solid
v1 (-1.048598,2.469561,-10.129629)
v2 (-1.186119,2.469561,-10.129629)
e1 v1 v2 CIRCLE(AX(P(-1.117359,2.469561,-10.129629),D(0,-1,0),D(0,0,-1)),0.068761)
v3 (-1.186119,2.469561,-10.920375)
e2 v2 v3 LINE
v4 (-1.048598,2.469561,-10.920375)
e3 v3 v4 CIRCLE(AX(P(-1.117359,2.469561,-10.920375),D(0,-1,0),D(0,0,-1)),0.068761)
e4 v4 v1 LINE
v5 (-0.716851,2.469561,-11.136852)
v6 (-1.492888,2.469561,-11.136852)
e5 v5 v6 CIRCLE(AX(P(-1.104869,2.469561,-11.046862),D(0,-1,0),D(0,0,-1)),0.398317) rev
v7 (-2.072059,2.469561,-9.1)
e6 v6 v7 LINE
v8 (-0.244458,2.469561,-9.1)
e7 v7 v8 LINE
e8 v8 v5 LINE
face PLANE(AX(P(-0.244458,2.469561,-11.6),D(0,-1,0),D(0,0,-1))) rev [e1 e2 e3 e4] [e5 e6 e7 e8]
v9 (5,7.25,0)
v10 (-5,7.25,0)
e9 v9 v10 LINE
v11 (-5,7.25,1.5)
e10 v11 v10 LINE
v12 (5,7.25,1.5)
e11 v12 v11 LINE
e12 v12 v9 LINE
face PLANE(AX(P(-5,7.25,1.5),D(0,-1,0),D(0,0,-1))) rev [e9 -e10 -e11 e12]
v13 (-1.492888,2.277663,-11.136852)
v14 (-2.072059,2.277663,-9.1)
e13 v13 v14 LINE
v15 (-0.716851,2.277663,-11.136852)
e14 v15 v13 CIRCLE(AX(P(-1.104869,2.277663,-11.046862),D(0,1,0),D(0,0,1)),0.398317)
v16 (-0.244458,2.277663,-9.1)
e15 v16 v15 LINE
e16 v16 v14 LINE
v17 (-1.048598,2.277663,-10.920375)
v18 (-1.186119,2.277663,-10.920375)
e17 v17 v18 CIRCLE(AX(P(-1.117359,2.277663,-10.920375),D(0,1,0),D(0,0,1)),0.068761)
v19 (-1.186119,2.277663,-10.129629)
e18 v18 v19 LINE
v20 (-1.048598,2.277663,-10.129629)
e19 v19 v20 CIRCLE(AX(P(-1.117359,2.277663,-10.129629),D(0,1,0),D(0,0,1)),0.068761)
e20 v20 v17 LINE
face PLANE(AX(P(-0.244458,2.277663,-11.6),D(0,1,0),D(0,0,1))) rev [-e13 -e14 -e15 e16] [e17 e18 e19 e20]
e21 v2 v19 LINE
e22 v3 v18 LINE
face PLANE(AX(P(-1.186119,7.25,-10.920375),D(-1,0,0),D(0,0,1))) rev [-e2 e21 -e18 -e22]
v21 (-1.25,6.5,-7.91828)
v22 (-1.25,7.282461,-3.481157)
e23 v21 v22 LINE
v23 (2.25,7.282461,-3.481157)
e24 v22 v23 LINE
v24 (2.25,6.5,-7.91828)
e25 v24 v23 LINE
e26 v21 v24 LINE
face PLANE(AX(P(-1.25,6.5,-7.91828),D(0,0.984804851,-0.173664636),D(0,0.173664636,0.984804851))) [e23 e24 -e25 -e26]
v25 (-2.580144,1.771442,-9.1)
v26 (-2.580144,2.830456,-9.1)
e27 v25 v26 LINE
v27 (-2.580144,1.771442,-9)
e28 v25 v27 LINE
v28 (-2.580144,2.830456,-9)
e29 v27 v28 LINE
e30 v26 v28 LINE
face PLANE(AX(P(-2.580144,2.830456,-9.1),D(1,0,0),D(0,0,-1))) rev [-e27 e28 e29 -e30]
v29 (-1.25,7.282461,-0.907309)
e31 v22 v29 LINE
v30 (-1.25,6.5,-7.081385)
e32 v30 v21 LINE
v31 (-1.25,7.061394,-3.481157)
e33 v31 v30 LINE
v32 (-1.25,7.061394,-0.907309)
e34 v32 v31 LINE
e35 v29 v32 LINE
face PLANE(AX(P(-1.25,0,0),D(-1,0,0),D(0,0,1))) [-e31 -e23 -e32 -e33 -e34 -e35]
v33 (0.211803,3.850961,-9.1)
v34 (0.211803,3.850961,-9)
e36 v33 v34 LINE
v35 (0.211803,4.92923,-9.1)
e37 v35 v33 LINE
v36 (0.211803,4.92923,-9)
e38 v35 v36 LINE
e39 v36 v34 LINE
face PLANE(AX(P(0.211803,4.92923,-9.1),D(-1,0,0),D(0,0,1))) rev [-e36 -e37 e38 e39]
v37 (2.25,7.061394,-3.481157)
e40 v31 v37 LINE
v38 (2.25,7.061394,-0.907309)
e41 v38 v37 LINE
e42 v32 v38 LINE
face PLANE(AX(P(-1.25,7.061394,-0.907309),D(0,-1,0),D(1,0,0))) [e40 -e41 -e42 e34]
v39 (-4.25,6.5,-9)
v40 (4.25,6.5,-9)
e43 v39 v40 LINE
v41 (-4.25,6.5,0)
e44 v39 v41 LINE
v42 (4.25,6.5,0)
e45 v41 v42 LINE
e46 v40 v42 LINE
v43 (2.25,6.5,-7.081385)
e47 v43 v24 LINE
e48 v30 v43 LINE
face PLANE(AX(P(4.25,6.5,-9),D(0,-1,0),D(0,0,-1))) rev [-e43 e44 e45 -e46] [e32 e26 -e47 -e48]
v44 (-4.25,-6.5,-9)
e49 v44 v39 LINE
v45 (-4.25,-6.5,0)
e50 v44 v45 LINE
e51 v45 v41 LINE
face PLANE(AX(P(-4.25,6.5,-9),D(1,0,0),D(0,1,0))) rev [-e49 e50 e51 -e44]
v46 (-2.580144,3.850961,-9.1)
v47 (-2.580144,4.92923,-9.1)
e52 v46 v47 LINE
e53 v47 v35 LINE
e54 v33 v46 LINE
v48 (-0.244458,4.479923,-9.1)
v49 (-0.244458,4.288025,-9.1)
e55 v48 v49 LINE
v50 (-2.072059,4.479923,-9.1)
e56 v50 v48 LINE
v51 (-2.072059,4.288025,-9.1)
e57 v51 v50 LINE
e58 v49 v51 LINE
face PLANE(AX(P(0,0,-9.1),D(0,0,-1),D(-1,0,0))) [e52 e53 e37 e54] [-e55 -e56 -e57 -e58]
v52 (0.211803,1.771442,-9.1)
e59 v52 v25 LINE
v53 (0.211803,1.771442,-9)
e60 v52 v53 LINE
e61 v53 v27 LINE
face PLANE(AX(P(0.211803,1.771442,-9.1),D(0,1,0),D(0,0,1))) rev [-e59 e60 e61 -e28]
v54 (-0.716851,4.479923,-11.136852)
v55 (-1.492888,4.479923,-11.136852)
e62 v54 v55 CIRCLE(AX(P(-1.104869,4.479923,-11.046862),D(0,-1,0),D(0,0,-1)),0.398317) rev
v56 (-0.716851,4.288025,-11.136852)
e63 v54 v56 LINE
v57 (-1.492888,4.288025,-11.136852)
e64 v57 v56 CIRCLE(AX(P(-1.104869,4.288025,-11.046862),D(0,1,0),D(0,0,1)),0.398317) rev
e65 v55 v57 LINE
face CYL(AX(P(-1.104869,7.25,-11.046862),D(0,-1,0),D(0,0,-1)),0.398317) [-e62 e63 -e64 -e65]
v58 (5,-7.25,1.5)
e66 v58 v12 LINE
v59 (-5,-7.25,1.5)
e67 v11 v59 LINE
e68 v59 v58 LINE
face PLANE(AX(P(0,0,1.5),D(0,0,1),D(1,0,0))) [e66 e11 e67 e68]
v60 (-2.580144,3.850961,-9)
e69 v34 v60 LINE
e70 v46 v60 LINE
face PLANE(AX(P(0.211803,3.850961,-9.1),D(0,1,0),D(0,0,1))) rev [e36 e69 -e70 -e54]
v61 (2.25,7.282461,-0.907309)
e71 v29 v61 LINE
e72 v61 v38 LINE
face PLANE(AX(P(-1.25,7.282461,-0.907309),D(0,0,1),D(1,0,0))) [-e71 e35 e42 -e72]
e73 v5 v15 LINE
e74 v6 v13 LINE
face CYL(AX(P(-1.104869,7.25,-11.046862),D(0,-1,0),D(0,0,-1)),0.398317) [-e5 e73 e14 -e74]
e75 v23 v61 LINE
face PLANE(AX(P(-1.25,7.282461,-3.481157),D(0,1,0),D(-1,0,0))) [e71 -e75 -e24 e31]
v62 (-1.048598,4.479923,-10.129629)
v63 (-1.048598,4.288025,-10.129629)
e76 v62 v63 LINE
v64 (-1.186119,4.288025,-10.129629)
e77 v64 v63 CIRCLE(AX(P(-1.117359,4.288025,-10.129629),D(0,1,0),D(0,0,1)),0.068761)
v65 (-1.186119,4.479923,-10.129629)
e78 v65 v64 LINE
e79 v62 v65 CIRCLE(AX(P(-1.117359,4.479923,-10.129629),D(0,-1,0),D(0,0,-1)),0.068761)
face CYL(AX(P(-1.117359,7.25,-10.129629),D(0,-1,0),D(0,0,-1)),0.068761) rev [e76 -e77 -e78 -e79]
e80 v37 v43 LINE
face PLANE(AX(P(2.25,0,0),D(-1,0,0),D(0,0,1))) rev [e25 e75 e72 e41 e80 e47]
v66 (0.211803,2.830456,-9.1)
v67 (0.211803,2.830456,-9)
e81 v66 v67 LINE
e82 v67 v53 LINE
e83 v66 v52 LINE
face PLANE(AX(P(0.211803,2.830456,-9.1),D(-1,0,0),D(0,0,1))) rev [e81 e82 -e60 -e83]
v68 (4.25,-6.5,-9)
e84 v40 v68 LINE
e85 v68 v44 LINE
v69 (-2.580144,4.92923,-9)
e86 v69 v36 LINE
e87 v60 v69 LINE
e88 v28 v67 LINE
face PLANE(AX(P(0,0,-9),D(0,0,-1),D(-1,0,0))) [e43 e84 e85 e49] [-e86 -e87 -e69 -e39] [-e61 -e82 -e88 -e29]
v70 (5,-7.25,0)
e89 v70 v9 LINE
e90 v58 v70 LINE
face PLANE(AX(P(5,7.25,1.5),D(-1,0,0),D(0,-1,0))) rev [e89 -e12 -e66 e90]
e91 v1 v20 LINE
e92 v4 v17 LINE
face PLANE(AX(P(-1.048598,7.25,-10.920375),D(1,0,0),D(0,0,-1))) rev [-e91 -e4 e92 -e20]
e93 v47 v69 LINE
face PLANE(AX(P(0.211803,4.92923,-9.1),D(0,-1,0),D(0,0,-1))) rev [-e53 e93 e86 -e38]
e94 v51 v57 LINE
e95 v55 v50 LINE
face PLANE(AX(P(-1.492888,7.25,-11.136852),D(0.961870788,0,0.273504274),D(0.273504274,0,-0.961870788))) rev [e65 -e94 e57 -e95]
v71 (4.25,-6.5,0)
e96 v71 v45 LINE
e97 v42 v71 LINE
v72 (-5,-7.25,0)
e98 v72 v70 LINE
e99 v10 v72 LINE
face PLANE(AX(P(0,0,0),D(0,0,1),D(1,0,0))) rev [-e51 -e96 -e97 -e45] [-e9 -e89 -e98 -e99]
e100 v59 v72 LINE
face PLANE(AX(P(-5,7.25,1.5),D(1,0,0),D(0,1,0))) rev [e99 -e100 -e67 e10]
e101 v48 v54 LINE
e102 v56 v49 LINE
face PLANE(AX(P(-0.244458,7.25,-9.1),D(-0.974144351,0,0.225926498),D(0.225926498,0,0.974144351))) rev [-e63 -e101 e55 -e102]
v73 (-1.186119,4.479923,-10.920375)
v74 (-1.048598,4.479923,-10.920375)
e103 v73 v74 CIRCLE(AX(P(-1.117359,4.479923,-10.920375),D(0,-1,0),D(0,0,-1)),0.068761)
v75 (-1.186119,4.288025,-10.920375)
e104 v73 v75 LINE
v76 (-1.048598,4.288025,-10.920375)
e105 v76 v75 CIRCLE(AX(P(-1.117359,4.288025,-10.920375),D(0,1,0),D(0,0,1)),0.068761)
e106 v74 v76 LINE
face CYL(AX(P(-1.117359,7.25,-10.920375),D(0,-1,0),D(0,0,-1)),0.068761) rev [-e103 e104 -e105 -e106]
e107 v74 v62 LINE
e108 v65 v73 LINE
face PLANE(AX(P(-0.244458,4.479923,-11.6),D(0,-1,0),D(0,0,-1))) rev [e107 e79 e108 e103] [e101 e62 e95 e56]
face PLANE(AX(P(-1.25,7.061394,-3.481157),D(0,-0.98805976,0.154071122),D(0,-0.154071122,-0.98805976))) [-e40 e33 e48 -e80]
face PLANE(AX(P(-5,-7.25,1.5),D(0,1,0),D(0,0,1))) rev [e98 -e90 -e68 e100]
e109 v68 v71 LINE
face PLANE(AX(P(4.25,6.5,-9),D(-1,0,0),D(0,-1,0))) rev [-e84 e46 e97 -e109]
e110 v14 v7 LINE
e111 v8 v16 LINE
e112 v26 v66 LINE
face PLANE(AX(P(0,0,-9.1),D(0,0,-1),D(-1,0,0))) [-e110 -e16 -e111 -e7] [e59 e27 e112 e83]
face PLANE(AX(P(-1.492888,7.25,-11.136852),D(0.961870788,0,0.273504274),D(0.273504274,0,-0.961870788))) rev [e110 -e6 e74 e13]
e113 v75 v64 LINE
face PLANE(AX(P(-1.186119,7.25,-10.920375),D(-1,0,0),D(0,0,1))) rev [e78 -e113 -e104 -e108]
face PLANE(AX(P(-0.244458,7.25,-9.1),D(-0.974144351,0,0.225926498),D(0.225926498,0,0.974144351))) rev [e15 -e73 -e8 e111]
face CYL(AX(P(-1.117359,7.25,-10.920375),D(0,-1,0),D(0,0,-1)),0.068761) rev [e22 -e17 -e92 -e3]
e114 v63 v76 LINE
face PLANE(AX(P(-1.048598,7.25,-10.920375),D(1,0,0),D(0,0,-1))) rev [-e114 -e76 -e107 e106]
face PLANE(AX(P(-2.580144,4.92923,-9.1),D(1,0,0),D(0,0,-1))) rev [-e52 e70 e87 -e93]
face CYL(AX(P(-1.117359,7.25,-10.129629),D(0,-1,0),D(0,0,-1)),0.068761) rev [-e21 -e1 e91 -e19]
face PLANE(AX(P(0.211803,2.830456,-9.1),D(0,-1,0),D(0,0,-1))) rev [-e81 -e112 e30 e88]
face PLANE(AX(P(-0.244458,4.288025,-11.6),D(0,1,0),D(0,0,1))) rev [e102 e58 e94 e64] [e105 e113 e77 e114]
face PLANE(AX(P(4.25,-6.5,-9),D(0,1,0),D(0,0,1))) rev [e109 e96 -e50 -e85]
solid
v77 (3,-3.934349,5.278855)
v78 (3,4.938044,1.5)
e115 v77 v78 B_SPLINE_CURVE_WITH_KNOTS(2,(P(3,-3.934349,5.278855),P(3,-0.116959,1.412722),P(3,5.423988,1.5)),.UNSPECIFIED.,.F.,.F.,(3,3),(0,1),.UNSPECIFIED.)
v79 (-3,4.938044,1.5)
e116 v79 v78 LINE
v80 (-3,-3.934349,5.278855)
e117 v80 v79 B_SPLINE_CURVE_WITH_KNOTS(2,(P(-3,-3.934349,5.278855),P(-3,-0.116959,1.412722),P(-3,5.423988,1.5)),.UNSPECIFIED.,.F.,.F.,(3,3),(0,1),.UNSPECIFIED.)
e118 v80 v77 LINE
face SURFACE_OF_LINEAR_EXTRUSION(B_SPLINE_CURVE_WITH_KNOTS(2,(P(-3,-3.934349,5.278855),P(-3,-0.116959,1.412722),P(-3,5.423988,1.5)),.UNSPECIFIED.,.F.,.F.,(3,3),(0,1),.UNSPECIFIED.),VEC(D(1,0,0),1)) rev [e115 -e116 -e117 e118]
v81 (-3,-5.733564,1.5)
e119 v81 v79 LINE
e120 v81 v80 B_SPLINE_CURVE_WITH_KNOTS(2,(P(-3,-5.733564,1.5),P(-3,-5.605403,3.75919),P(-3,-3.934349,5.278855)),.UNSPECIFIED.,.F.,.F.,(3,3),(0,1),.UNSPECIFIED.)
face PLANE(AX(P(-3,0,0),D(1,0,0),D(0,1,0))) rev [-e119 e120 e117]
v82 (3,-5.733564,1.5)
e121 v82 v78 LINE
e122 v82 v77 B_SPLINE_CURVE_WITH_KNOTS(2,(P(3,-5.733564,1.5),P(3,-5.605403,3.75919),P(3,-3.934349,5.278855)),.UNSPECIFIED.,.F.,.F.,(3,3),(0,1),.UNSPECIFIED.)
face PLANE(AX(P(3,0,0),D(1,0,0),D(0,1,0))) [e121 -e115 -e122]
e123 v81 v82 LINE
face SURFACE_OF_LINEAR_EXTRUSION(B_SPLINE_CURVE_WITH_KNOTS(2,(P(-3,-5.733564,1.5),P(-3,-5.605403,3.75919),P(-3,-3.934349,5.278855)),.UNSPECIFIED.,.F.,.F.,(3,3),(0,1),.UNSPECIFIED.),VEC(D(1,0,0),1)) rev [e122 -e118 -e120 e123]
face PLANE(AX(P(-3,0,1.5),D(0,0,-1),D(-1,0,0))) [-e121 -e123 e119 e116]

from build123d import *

# Parameters (mm, degrees)
SKETCH1_W               = 10
SKETCH1_H               = 14.5
BOSS_EXTRUDE1_DEPTH     = 1.5
SKETCH2_W               = 8.5
SKETCH2_H               = 13
BOSS_EXTRUDE2_DEPTH     = 9
SKETCH3_W               = 2.791946686
SKETCH3_H               = 1.078269065
SKETCH3_H_2             = 1.059014261
BOSS_EXTRUDE3_DEPTH     = 0.1
SKETCH4_W               = 1.827601408
SKETCH4_H               = 0.191898148
SKETCH4_H_2             = 0.191898147
BOSS_EXTRUDE4_DEPTH     = 2.5
CUT_EXTRUDE1_DEPTH      = 16.822021608
CUT_EXTRUDE2_DEPTH      = 16.708866747
CUT_EXTRUDE2_DEPTH_BACK = 16.708866747
BOSS_EXTRUDE5_DEPTH     = 3.5
BOSS_EXTRUDE6_DEPTH     = 6


with BuildPart() as part:
    # Sketch1 → Boss-Extrude1 (new body)
    with BuildSketch(Plane.XY):
        Rectangle(SKETCH1_W, SKETCH1_H)
    extrude(amount=BOSS_EXTRUDE1_DEPTH)

    # Sketch2 → Boss-Extrude2 (add)
    with BuildSketch(Plane(origin=(0, 0, 0), x_dir=(-1, 0, 0), z_dir=(0, 0, -1))):
        Rectangle(SKETCH2_W, SKETCH2_H)
    extrude(amount=BOSS_EXTRUDE2_DEPTH)

    # Sketch3 → Boss-Extrude3 (add)
    with BuildSketch(Plane(origin=(0, 0, -9), x_dir=(-1, 0, 0), z_dir=(0, 0, -1))):
        with Locations((1.184170491, 4.39009548)):
            Rectangle(SKETCH3_W, SKETCH3_H)
        with Locations((1.184170491, 2.300949166)):
            Rectangle(SKETCH3_W, SKETCH3_H_2)
    extrude(amount=BOSS_EXTRUDE3_DEPTH)

    # Sketch4 → Boss-Extrude4 (add)
    with BuildSketch(Plane(origin=(0, 0, -9.1), x_dir=(-1, 0, 0), z_dir=(0, 0, -1))):
        with Locations((1.158258605, 4.383973913)):
            Rectangle(SKETCH4_W, SKETCH4_H)
        with Locations((1.158258605, 2.373612365)):
            Rectangle(SKETCH4_W, SKETCH4_H_2)
    extrude(amount=BOSS_EXTRUDE4_DEPTH)

    # Sketch5 → Cut-Extrude1 (cut, through all)
    with BuildSketch(Plane.XZ.offset(-2.277663291)):
        with BuildLine():
            Line((-0.244457901, -9.1), (-0.716850813, -11.136852213))
            ThreePointArc((-0.716850813, -11.136852213), (-1.104869499, -11.44517919), (-1.492888184, -11.136852213))
            Line((-1.492888184, -11.136852213), (-2.072059309, -9.1))
            Line((-2.072059309, -9.1), (-2.072059309, -11.6))
            Line((-2.072059309, -11.6), (-0.244457901, -11.6))
            Line((-0.244457901, -11.6), (-0.244457901, -9.1))
        make_face()
    extrude(amount=-CUT_EXTRUDE1_DEPTH, mode=Mode.SUBTRACT)

    # Sketch6 → Cut-Extrude2 (cut, two sides: drawn at the far end of the back side and taken through both)
    with BuildSketch(Plane.XZ.offset(-2.277663291).offset(-CUT_EXTRUDE2_DEPTH_BACK)):
        with BuildLine():
            Line((-1.18611903, -10.920374874), (-1.18611903, -10.129628854))
            ThreePointArc((-1.18611903, -10.129628854), (-1.117358506, -10.060868331), (-1.048597983, -10.129628854))
            Line((-1.048597983, -10.129628854), (-1.048597983, -10.920374874))
            ThreePointArc((-1.048597983, -10.920374874), (-1.117358506, -10.989135398), (-1.18611903, -10.920374874))
        make_face()
    extrude(amount=CUT_EXTRUDE2_DEPTH + CUT_EXTRUDE2_DEPTH_BACK, mode=Mode.SUBTRACT)

    # Sketch7 → Boss-Extrude5 (add)
    with BuildSketch(Plane(origin=(2.25, 0, 0), x_dir=(0, 0, -1), z_dir=(1, 0, 0))):
        Polygon((7.918280304, 6.5), (3.481156502, 7.282461104), (0.907308887, 7.282461104), (0.907308887, 7.061394438), (3.481156502, 7.061394438), (7.081385067, 6.5), align=None)
    extrude(amount=-BOSS_EXTRUDE5_DEPTH)


with BuildPart() as body_2:
    # Sketch8 → Boss-Extrude6 (new body)
    with BuildSketch(Plane(origin=(3, 0, 0), x_dir=(0, 0, -1), z_dir=(1, 0, 0))):
        with BuildLine():
            add(Edge.make_bspline(
                [(-1.5, -5.733564241), (-3.759190449, -5.60540311), (-5.278855164, -3.934348818)],
                knots=[0, 0, 0, 1, 1, 1], degree=2))
            Line((-1.5, -5.733564241), (-1.5, 4.938044071))
            add(Edge.make_bspline(
                [(-5.278855164, -3.934348818), (-1.583424744, -0.285510331), (-1.5, 4.938044071)],
                knots=[0, 0, 0, 0.955846551, 0.955846551, 0.955846551], degree=2))
        make_face()
    extrude(amount=-BOSS_EXTRUDE6_DEPTH)


solid = Compound([part.part, body_2.part])
